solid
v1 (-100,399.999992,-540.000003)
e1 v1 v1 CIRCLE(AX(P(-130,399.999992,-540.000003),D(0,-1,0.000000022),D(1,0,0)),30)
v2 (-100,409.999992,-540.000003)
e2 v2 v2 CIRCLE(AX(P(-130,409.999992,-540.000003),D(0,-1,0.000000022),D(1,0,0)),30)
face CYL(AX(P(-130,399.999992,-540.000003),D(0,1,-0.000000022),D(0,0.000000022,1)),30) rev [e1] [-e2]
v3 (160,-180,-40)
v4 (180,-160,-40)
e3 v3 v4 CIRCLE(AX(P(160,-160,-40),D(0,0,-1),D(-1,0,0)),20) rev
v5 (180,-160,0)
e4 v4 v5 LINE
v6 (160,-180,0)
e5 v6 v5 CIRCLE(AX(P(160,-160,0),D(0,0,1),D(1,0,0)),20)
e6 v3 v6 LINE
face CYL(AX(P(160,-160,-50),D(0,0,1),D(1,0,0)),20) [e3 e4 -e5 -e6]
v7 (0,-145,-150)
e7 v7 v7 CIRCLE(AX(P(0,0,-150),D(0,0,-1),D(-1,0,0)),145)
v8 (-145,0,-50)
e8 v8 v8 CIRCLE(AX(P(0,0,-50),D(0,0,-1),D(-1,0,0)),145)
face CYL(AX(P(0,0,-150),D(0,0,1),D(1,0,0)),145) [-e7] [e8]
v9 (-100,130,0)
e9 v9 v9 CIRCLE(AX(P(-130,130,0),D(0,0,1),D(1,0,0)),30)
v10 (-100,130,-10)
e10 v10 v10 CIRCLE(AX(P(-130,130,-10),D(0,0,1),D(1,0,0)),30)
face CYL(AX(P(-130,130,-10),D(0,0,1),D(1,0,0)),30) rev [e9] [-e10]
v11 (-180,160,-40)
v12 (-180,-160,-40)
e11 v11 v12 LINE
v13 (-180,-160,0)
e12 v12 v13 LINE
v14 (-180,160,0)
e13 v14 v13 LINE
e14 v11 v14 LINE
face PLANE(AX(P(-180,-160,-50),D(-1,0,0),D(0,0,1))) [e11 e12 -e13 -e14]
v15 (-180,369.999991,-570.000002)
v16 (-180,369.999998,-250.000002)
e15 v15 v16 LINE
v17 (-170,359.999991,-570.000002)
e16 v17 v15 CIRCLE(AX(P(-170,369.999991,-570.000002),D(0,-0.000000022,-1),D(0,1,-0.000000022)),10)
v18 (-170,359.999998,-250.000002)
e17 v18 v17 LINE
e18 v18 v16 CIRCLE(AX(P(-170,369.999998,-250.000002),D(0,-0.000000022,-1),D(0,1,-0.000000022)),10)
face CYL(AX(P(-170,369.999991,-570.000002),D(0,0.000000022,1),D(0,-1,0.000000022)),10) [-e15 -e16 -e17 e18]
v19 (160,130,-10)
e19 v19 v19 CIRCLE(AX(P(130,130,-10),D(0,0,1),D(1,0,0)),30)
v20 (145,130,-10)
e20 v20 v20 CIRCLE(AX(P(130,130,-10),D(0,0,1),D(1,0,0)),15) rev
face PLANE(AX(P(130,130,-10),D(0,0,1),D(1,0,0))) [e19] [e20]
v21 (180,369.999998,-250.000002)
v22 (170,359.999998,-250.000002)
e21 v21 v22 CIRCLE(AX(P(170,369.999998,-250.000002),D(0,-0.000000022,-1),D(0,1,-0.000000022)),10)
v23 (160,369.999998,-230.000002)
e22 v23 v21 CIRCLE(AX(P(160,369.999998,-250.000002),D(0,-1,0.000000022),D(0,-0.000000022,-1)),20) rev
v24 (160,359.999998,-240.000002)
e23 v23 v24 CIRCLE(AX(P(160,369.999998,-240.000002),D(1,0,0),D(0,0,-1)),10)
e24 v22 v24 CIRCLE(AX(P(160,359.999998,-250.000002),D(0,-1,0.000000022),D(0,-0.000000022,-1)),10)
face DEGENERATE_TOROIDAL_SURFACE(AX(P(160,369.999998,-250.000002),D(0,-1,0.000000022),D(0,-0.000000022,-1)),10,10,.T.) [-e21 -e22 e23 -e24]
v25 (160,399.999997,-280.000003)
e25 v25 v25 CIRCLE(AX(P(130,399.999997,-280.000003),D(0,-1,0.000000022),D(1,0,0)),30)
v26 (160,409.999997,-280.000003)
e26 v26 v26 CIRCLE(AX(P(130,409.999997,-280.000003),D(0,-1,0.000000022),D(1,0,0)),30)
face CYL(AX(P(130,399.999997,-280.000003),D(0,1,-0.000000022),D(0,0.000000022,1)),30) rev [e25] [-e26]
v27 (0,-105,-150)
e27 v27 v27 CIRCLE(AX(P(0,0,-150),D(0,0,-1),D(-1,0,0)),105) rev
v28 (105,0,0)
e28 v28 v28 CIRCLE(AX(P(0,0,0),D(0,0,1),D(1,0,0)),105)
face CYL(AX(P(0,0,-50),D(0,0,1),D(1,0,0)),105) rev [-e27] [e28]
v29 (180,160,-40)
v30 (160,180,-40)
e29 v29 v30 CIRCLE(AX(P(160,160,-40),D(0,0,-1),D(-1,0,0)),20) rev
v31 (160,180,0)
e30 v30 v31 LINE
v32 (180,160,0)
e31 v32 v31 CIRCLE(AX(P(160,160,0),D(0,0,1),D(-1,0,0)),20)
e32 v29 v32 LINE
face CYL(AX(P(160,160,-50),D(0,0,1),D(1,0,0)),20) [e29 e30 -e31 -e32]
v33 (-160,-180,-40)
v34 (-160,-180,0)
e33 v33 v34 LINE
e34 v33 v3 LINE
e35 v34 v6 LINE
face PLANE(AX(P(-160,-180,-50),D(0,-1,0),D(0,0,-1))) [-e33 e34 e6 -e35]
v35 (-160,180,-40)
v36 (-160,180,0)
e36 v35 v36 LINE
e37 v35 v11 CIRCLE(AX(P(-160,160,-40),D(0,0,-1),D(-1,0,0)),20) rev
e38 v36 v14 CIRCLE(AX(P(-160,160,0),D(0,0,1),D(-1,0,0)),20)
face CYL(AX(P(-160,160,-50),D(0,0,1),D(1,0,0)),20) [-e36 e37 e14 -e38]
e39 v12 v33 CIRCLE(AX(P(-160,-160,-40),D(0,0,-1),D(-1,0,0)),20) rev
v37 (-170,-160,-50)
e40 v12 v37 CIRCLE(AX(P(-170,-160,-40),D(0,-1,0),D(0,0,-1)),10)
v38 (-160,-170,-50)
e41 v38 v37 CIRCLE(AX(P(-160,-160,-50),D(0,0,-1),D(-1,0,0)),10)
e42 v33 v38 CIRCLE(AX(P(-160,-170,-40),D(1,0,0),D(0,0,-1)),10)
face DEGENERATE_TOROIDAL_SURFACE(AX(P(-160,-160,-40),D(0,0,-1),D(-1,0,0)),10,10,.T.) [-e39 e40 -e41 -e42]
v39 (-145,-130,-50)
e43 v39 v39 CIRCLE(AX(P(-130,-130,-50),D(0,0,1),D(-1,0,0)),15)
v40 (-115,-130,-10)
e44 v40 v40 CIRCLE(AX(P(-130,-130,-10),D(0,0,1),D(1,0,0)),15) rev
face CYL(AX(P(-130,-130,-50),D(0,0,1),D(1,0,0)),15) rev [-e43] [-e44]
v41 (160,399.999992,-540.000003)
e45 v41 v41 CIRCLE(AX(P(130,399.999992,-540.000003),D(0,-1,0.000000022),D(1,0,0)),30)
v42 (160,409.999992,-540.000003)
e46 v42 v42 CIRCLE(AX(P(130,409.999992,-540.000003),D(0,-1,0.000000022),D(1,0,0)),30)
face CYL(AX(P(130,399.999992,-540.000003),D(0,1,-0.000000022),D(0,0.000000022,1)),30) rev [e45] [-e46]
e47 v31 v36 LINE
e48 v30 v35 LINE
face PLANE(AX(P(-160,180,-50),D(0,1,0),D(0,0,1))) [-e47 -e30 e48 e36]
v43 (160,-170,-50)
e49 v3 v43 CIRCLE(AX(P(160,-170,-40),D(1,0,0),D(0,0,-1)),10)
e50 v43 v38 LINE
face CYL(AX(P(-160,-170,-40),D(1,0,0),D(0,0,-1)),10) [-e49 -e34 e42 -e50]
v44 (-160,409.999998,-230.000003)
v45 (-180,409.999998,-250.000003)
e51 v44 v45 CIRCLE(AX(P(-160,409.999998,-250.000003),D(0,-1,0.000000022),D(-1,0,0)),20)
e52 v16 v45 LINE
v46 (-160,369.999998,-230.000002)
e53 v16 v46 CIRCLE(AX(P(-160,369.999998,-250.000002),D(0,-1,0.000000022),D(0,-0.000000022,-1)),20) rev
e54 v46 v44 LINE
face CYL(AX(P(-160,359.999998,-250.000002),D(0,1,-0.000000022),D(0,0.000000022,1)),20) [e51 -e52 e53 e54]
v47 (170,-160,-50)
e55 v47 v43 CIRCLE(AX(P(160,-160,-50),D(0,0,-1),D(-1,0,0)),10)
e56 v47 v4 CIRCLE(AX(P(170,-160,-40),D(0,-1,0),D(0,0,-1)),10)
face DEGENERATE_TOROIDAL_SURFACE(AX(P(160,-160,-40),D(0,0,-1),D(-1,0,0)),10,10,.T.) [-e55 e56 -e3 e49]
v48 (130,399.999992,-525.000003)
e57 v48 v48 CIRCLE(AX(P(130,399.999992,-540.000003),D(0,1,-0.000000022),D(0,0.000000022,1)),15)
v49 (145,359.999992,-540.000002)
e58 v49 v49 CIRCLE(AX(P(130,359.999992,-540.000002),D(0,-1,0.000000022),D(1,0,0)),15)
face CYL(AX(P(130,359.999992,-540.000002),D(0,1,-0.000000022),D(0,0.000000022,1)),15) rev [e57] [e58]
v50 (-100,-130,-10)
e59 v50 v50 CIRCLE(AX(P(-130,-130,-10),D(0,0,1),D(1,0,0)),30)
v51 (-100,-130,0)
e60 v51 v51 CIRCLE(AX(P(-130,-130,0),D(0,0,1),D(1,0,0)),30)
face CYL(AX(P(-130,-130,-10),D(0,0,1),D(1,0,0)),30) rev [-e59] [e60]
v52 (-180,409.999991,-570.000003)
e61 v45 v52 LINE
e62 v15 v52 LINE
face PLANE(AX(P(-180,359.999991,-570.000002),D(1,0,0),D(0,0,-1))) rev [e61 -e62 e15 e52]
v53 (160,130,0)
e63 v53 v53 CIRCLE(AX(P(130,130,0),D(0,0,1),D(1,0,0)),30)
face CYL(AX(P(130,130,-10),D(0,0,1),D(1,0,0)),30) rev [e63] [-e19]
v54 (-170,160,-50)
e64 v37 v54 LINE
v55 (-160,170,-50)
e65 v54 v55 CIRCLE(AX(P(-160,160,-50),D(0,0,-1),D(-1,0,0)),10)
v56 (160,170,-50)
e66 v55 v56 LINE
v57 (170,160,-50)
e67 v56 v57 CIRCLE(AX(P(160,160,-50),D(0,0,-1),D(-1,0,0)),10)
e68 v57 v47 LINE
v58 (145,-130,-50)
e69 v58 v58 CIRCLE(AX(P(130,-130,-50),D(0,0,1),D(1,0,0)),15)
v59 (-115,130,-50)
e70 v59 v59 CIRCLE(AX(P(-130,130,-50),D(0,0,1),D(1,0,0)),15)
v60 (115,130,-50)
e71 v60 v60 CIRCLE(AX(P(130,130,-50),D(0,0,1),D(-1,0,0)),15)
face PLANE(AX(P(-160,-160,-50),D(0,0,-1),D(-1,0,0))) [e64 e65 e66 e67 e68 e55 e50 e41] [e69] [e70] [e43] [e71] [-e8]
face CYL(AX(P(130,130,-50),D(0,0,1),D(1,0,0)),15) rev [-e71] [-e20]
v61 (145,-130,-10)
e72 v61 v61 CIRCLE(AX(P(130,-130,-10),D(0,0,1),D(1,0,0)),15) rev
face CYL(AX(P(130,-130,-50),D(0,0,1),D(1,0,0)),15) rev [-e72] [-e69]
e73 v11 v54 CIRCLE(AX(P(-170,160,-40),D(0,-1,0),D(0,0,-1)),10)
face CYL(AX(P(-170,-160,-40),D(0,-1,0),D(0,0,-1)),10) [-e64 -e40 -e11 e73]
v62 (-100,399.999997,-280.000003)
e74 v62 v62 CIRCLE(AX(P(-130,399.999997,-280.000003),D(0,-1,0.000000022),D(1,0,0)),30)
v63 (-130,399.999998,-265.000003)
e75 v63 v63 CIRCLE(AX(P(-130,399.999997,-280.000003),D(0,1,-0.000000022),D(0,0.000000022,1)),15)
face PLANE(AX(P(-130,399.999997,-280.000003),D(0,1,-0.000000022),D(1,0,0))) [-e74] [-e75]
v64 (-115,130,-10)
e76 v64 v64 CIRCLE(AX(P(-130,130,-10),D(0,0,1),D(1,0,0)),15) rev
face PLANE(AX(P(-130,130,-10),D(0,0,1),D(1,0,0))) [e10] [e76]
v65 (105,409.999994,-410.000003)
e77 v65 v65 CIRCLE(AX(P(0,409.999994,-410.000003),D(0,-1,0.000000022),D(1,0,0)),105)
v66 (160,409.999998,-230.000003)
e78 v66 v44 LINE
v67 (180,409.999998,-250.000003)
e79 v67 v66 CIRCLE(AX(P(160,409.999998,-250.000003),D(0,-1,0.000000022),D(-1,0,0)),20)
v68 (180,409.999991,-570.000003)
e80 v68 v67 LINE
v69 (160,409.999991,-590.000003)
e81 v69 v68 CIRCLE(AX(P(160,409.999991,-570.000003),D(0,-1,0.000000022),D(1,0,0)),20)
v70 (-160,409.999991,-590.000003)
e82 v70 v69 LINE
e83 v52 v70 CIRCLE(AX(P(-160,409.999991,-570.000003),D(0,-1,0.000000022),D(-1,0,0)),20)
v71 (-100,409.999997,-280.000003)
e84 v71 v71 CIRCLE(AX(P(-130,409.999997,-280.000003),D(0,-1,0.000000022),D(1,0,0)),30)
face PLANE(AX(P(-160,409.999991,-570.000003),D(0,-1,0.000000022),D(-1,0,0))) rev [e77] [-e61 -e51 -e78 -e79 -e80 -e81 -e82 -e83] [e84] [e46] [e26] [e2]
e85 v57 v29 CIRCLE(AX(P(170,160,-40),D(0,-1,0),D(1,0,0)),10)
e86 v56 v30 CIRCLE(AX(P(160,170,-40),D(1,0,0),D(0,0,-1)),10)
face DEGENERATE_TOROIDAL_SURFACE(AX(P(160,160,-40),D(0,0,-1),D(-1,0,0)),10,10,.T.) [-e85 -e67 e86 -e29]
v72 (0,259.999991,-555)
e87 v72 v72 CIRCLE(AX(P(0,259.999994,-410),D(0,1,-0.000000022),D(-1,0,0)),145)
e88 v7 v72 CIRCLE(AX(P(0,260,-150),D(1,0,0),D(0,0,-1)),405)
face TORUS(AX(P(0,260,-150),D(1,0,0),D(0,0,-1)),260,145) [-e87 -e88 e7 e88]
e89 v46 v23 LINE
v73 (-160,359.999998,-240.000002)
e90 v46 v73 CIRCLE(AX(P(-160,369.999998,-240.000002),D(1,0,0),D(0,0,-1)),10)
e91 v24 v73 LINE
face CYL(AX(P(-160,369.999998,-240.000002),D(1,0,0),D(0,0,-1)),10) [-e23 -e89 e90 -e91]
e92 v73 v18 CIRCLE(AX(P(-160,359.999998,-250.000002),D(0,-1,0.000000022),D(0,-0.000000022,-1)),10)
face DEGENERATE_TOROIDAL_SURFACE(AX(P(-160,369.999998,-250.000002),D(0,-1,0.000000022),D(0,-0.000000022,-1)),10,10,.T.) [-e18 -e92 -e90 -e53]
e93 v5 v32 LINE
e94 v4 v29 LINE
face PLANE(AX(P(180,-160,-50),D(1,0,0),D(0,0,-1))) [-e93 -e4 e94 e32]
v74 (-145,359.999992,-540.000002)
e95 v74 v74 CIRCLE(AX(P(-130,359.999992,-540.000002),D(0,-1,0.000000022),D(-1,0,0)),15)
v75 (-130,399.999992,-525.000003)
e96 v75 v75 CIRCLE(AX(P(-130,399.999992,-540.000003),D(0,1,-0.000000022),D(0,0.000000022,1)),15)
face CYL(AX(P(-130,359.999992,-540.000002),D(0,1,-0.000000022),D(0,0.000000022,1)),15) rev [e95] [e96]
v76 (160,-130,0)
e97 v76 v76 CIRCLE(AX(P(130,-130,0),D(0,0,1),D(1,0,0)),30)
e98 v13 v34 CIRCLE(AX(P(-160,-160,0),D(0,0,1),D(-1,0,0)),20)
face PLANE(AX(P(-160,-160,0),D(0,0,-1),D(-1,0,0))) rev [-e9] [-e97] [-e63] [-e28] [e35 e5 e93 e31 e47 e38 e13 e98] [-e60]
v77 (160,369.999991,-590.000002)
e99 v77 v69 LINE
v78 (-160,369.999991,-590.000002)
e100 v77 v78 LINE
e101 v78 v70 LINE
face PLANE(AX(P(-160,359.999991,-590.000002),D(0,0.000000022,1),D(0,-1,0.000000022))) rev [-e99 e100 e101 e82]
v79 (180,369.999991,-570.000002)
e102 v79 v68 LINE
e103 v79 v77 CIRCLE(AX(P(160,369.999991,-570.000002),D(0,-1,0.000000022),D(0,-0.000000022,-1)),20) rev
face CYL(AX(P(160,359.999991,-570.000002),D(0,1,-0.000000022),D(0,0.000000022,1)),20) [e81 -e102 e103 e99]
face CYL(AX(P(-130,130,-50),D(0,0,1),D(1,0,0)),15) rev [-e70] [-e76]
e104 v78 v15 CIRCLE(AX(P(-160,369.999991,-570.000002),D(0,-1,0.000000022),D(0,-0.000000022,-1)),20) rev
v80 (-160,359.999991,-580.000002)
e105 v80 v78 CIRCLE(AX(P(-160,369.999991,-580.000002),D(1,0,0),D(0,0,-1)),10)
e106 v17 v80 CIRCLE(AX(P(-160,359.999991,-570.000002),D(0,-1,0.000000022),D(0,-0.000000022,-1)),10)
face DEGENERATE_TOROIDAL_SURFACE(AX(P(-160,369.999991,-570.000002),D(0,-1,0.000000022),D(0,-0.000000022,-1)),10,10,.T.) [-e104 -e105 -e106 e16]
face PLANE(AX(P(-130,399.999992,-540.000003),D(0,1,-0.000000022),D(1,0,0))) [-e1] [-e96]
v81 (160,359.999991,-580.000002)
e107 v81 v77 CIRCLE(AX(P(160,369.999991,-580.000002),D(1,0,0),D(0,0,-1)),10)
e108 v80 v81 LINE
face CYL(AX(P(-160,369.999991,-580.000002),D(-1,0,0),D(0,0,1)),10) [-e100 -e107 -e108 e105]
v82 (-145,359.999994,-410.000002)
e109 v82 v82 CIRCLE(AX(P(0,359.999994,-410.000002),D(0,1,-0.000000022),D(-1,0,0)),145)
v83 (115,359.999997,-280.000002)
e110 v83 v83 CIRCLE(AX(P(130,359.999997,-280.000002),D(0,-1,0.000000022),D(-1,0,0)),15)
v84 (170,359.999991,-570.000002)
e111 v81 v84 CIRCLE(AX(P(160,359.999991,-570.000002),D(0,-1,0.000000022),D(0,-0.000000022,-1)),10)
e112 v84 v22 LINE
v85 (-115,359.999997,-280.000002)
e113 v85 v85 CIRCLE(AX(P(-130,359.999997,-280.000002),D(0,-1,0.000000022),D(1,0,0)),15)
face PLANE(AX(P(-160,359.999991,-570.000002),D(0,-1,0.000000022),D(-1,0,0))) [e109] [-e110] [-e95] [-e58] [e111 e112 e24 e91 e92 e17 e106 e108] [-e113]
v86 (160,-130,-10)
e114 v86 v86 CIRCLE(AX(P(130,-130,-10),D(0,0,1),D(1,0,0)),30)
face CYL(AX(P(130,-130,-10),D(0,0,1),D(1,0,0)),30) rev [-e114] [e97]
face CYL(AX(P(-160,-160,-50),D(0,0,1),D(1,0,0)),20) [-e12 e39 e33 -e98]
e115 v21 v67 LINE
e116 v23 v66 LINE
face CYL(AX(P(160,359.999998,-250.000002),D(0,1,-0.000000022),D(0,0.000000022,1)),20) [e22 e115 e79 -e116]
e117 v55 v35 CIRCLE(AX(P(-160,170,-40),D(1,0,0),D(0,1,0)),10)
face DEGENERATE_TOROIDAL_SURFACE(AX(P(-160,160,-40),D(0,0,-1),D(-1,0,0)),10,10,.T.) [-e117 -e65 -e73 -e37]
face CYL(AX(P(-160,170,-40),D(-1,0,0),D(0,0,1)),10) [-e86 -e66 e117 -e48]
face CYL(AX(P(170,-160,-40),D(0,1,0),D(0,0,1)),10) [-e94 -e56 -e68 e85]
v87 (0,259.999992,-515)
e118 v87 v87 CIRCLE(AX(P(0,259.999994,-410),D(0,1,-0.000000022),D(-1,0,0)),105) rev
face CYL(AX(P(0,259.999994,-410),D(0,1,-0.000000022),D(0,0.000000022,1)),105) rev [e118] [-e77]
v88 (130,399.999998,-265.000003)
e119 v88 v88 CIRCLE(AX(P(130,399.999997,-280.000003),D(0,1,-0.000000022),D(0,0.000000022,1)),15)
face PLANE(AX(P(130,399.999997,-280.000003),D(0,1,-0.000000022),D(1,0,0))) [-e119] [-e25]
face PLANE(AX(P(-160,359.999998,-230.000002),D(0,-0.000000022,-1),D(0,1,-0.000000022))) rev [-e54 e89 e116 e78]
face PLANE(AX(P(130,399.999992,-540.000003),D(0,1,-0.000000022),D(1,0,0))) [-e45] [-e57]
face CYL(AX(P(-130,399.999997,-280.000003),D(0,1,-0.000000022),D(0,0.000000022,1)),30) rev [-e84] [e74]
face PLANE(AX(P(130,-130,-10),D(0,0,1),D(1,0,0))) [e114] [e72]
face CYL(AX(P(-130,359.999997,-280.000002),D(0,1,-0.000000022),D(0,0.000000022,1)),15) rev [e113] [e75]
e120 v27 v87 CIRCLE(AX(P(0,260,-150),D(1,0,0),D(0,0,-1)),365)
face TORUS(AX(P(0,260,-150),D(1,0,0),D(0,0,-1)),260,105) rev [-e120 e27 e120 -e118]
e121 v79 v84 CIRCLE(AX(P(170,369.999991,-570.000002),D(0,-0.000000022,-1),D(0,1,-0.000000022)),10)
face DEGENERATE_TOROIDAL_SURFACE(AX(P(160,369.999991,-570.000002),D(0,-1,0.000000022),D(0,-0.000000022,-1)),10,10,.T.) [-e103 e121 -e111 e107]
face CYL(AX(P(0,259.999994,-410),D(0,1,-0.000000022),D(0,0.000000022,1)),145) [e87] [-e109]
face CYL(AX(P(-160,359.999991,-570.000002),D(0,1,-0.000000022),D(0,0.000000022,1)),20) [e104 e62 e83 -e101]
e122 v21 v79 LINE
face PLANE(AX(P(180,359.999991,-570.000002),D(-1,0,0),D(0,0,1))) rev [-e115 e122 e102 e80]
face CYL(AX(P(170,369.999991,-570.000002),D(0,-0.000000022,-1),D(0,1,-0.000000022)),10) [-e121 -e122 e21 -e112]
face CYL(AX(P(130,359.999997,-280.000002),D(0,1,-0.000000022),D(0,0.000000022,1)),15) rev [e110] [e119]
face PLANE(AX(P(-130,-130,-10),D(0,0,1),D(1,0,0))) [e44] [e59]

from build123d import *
from build123d.topology import SkipClean

# Parameters (mm, degrees)
IZIM3_R                     = 105
IZIM3_R_2                   = 15
Y_KSEKLIK_EKSTR_ZYON1_DEPTH = 50
IZIM4_R                     = 30
KES_EKSTR_ZYON1_DEPTH       = 10
IZIM5_R                     = 145
IZIM5_R_2                   = 105
EKSTR_ZYON_NCE1_DEPTH       = 100
IZIM95_R                    = 145
IZIM95_R_2                  = 105
RADYUS1_R                   = 10
RADYUS2_R                   = 10


with BuildPart() as part:
    # Çizim3 → Yükseklik-Ekstrüzyon1 (new body)
    with BuildSketch(Plane.XY):
        with BuildLine():
            Line((-160, -180), (160, -180))
            ThreePointArc((160, -180), (174.142135624, -174.142135624), (180, -160))
            Line((180, -160), (180, 160))
            ThreePointArc((180, 160), (174.142135624, 174.142135624), (160, 180))
            Line((160, 180), (-160, 180))
            ThreePointArc((-160, 180), (-174.142135624, 174.142135624), (-180, 160))
            Line((-180, 160), (-180, -160))
            ThreePointArc((-180, -160), (-174.142135624, -174.142135624), (-160, -180))
        make_face()
        Circle(IZIM3_R, mode=Mode.SUBTRACT)
        with Locations((-130, 130)):
            Circle(IZIM3_R_2, mode=Mode.SUBTRACT)
        with Locations((130, 130)):
            Circle(IZIM3_R_2, mode=Mode.SUBTRACT)
        with Locations((-130, -130)):
            Circle(IZIM3_R_2, mode=Mode.SUBTRACT)
        with Locations((130, -130)):
            Circle(IZIM3_R_2, mode=Mode.SUBTRACT)
    y_kseklik_ekstr_zyon1 = extrude(amount=-Y_KSEKLIK_EKSTR_ZYON1_DEPTH)

    # Çizim4 → Kes-Ekstrüzyon1 (cut)
    with BuildSketch(Plane.XY):
        with Locations((-130, 130)):
            Circle(IZIM4_R)
        with Locations((130, 130)):
            Circle(IZIM4_R)
        with Locations((130, -130)):
            Circle(IZIM4_R)
        with Locations((-130, -130)):
            Circle(IZIM4_R)
    kes_ekstr_zyon1 = extrude(amount=-KES_EKSTR_ZYON1_DEPTH, mode=Mode.SUBTRACT)

    # Çizim5 → Ekstrüzyon-İnce1 (add)
    with SkipClean():  # the faces are left unmerged after this step: merging them gives an invalid solid
        with BuildSketch(Plane(origin=(0, 0, -50), x_dir=(-1, 0, 0), z_dir=(0, 0, -1))):
            Circle(IZIM5_R)
            Circle(IZIM5_R_2, mode=Mode.SUBTRACT)
        ekstr_zyon_nce1 = extrude(amount=EKSTR_ZYON_NCE1_DEPTH)
    add(part.part.scale(1), mode=Mode.REPLACE)  # the faces are merged on a copy

    # Süpür1: sweep along a path in Çizim6
    with BuildLine(Plane(origin=(0, 0, 0), x_dir=(0, 0, -1), z_dir=(1, 0, 0))) as s_p_r1_path:
        ThreePointArc((150, 0), (333.847761128, 76.152234911), (410, 259.999994399))
    # Çizim95 → Süpür1 (sweep)
    with BuildSketch(Plane(origin=(0, 0, -150), x_dir=(-1, 0, 0), z_dir=(0, 0, -1))):
        Circle(IZIM95_R)
        Circle(IZIM95_R_2, mode=Mode.SUBTRACT)
    sweep(path=s_p_r1_path.line)

    # Aynalama1: Ekstrüzyon-İnce1 across plane
    add(ekstr_zyon_nce1.mirror(Plane(origin=(0, 204.999997199, -205.000001616), x_dir=(0, 0.7071067888032234, 0.7071067735698715), z_dir=(0, 0.7071067735698718, -0.7071067888032233))))

    # Aynalama2: Yükseklik-Ekstrüzyon1, Kes-Ekstrüzyon1 across plane
    add(y_kseklik_ekstr_zyon1.mirror(Plane(origin=(0, 204.999997199, -205.000001616), x_dir=(0, 0.7071067888032234, 0.7071067735698715), z_dir=(0, 0.7071067735698718, -0.7071067888032233))))
    add(kes_ekstr_zyon1.mirror(Plane(origin=(0, 204.999997199, -205.000001616), x_dir=(0, 0.7071067888032234, 0.7071067735698715), z_dir=(0, 0.7071067735698718, -0.7071067888032233))), mode=Mode.SUBTRACT)

    # Radyus1
    radyus1_edges = [part.edges().sort_by_distance(p)[0] for p in [
        (174.142135624, 359.999990647, -584.142137778),
        (0, 359.999990521, -590.000002154),
        (-174.142135624, 359.999990647, -584.142137778),
        (-180, 359.999994399, -410.000002154),
        (-174.142135624, 359.99999815, -235.857866531),
        (0, 359.999998277, -230.000002154),
        (174.142135624, 359.99999815, -235.857866531),
        (180, 359.999994399, -410.000002154),
    ]]
    fillet(radyus1_edges, radius=RADYUS1_R)

    # Radyus2
    radyus2_edges = [part.edges().sort_by_distance(p)[0] for p in [
        (174.142135624, -174.142135624, -50),
        (0, -180, -50),
        (-174.142135624, -174.142135624, -50),
        (-180, 0, -50),
        (-174.142135624, 174.142135624, -50),
        (0, 180, -50),
        (174.142135624, 174.142135624, -50),
        (180, 0, -50),
    ]]
    fillet(radyus2_edges, radius=RADYUS2_R)


solid = part.part
